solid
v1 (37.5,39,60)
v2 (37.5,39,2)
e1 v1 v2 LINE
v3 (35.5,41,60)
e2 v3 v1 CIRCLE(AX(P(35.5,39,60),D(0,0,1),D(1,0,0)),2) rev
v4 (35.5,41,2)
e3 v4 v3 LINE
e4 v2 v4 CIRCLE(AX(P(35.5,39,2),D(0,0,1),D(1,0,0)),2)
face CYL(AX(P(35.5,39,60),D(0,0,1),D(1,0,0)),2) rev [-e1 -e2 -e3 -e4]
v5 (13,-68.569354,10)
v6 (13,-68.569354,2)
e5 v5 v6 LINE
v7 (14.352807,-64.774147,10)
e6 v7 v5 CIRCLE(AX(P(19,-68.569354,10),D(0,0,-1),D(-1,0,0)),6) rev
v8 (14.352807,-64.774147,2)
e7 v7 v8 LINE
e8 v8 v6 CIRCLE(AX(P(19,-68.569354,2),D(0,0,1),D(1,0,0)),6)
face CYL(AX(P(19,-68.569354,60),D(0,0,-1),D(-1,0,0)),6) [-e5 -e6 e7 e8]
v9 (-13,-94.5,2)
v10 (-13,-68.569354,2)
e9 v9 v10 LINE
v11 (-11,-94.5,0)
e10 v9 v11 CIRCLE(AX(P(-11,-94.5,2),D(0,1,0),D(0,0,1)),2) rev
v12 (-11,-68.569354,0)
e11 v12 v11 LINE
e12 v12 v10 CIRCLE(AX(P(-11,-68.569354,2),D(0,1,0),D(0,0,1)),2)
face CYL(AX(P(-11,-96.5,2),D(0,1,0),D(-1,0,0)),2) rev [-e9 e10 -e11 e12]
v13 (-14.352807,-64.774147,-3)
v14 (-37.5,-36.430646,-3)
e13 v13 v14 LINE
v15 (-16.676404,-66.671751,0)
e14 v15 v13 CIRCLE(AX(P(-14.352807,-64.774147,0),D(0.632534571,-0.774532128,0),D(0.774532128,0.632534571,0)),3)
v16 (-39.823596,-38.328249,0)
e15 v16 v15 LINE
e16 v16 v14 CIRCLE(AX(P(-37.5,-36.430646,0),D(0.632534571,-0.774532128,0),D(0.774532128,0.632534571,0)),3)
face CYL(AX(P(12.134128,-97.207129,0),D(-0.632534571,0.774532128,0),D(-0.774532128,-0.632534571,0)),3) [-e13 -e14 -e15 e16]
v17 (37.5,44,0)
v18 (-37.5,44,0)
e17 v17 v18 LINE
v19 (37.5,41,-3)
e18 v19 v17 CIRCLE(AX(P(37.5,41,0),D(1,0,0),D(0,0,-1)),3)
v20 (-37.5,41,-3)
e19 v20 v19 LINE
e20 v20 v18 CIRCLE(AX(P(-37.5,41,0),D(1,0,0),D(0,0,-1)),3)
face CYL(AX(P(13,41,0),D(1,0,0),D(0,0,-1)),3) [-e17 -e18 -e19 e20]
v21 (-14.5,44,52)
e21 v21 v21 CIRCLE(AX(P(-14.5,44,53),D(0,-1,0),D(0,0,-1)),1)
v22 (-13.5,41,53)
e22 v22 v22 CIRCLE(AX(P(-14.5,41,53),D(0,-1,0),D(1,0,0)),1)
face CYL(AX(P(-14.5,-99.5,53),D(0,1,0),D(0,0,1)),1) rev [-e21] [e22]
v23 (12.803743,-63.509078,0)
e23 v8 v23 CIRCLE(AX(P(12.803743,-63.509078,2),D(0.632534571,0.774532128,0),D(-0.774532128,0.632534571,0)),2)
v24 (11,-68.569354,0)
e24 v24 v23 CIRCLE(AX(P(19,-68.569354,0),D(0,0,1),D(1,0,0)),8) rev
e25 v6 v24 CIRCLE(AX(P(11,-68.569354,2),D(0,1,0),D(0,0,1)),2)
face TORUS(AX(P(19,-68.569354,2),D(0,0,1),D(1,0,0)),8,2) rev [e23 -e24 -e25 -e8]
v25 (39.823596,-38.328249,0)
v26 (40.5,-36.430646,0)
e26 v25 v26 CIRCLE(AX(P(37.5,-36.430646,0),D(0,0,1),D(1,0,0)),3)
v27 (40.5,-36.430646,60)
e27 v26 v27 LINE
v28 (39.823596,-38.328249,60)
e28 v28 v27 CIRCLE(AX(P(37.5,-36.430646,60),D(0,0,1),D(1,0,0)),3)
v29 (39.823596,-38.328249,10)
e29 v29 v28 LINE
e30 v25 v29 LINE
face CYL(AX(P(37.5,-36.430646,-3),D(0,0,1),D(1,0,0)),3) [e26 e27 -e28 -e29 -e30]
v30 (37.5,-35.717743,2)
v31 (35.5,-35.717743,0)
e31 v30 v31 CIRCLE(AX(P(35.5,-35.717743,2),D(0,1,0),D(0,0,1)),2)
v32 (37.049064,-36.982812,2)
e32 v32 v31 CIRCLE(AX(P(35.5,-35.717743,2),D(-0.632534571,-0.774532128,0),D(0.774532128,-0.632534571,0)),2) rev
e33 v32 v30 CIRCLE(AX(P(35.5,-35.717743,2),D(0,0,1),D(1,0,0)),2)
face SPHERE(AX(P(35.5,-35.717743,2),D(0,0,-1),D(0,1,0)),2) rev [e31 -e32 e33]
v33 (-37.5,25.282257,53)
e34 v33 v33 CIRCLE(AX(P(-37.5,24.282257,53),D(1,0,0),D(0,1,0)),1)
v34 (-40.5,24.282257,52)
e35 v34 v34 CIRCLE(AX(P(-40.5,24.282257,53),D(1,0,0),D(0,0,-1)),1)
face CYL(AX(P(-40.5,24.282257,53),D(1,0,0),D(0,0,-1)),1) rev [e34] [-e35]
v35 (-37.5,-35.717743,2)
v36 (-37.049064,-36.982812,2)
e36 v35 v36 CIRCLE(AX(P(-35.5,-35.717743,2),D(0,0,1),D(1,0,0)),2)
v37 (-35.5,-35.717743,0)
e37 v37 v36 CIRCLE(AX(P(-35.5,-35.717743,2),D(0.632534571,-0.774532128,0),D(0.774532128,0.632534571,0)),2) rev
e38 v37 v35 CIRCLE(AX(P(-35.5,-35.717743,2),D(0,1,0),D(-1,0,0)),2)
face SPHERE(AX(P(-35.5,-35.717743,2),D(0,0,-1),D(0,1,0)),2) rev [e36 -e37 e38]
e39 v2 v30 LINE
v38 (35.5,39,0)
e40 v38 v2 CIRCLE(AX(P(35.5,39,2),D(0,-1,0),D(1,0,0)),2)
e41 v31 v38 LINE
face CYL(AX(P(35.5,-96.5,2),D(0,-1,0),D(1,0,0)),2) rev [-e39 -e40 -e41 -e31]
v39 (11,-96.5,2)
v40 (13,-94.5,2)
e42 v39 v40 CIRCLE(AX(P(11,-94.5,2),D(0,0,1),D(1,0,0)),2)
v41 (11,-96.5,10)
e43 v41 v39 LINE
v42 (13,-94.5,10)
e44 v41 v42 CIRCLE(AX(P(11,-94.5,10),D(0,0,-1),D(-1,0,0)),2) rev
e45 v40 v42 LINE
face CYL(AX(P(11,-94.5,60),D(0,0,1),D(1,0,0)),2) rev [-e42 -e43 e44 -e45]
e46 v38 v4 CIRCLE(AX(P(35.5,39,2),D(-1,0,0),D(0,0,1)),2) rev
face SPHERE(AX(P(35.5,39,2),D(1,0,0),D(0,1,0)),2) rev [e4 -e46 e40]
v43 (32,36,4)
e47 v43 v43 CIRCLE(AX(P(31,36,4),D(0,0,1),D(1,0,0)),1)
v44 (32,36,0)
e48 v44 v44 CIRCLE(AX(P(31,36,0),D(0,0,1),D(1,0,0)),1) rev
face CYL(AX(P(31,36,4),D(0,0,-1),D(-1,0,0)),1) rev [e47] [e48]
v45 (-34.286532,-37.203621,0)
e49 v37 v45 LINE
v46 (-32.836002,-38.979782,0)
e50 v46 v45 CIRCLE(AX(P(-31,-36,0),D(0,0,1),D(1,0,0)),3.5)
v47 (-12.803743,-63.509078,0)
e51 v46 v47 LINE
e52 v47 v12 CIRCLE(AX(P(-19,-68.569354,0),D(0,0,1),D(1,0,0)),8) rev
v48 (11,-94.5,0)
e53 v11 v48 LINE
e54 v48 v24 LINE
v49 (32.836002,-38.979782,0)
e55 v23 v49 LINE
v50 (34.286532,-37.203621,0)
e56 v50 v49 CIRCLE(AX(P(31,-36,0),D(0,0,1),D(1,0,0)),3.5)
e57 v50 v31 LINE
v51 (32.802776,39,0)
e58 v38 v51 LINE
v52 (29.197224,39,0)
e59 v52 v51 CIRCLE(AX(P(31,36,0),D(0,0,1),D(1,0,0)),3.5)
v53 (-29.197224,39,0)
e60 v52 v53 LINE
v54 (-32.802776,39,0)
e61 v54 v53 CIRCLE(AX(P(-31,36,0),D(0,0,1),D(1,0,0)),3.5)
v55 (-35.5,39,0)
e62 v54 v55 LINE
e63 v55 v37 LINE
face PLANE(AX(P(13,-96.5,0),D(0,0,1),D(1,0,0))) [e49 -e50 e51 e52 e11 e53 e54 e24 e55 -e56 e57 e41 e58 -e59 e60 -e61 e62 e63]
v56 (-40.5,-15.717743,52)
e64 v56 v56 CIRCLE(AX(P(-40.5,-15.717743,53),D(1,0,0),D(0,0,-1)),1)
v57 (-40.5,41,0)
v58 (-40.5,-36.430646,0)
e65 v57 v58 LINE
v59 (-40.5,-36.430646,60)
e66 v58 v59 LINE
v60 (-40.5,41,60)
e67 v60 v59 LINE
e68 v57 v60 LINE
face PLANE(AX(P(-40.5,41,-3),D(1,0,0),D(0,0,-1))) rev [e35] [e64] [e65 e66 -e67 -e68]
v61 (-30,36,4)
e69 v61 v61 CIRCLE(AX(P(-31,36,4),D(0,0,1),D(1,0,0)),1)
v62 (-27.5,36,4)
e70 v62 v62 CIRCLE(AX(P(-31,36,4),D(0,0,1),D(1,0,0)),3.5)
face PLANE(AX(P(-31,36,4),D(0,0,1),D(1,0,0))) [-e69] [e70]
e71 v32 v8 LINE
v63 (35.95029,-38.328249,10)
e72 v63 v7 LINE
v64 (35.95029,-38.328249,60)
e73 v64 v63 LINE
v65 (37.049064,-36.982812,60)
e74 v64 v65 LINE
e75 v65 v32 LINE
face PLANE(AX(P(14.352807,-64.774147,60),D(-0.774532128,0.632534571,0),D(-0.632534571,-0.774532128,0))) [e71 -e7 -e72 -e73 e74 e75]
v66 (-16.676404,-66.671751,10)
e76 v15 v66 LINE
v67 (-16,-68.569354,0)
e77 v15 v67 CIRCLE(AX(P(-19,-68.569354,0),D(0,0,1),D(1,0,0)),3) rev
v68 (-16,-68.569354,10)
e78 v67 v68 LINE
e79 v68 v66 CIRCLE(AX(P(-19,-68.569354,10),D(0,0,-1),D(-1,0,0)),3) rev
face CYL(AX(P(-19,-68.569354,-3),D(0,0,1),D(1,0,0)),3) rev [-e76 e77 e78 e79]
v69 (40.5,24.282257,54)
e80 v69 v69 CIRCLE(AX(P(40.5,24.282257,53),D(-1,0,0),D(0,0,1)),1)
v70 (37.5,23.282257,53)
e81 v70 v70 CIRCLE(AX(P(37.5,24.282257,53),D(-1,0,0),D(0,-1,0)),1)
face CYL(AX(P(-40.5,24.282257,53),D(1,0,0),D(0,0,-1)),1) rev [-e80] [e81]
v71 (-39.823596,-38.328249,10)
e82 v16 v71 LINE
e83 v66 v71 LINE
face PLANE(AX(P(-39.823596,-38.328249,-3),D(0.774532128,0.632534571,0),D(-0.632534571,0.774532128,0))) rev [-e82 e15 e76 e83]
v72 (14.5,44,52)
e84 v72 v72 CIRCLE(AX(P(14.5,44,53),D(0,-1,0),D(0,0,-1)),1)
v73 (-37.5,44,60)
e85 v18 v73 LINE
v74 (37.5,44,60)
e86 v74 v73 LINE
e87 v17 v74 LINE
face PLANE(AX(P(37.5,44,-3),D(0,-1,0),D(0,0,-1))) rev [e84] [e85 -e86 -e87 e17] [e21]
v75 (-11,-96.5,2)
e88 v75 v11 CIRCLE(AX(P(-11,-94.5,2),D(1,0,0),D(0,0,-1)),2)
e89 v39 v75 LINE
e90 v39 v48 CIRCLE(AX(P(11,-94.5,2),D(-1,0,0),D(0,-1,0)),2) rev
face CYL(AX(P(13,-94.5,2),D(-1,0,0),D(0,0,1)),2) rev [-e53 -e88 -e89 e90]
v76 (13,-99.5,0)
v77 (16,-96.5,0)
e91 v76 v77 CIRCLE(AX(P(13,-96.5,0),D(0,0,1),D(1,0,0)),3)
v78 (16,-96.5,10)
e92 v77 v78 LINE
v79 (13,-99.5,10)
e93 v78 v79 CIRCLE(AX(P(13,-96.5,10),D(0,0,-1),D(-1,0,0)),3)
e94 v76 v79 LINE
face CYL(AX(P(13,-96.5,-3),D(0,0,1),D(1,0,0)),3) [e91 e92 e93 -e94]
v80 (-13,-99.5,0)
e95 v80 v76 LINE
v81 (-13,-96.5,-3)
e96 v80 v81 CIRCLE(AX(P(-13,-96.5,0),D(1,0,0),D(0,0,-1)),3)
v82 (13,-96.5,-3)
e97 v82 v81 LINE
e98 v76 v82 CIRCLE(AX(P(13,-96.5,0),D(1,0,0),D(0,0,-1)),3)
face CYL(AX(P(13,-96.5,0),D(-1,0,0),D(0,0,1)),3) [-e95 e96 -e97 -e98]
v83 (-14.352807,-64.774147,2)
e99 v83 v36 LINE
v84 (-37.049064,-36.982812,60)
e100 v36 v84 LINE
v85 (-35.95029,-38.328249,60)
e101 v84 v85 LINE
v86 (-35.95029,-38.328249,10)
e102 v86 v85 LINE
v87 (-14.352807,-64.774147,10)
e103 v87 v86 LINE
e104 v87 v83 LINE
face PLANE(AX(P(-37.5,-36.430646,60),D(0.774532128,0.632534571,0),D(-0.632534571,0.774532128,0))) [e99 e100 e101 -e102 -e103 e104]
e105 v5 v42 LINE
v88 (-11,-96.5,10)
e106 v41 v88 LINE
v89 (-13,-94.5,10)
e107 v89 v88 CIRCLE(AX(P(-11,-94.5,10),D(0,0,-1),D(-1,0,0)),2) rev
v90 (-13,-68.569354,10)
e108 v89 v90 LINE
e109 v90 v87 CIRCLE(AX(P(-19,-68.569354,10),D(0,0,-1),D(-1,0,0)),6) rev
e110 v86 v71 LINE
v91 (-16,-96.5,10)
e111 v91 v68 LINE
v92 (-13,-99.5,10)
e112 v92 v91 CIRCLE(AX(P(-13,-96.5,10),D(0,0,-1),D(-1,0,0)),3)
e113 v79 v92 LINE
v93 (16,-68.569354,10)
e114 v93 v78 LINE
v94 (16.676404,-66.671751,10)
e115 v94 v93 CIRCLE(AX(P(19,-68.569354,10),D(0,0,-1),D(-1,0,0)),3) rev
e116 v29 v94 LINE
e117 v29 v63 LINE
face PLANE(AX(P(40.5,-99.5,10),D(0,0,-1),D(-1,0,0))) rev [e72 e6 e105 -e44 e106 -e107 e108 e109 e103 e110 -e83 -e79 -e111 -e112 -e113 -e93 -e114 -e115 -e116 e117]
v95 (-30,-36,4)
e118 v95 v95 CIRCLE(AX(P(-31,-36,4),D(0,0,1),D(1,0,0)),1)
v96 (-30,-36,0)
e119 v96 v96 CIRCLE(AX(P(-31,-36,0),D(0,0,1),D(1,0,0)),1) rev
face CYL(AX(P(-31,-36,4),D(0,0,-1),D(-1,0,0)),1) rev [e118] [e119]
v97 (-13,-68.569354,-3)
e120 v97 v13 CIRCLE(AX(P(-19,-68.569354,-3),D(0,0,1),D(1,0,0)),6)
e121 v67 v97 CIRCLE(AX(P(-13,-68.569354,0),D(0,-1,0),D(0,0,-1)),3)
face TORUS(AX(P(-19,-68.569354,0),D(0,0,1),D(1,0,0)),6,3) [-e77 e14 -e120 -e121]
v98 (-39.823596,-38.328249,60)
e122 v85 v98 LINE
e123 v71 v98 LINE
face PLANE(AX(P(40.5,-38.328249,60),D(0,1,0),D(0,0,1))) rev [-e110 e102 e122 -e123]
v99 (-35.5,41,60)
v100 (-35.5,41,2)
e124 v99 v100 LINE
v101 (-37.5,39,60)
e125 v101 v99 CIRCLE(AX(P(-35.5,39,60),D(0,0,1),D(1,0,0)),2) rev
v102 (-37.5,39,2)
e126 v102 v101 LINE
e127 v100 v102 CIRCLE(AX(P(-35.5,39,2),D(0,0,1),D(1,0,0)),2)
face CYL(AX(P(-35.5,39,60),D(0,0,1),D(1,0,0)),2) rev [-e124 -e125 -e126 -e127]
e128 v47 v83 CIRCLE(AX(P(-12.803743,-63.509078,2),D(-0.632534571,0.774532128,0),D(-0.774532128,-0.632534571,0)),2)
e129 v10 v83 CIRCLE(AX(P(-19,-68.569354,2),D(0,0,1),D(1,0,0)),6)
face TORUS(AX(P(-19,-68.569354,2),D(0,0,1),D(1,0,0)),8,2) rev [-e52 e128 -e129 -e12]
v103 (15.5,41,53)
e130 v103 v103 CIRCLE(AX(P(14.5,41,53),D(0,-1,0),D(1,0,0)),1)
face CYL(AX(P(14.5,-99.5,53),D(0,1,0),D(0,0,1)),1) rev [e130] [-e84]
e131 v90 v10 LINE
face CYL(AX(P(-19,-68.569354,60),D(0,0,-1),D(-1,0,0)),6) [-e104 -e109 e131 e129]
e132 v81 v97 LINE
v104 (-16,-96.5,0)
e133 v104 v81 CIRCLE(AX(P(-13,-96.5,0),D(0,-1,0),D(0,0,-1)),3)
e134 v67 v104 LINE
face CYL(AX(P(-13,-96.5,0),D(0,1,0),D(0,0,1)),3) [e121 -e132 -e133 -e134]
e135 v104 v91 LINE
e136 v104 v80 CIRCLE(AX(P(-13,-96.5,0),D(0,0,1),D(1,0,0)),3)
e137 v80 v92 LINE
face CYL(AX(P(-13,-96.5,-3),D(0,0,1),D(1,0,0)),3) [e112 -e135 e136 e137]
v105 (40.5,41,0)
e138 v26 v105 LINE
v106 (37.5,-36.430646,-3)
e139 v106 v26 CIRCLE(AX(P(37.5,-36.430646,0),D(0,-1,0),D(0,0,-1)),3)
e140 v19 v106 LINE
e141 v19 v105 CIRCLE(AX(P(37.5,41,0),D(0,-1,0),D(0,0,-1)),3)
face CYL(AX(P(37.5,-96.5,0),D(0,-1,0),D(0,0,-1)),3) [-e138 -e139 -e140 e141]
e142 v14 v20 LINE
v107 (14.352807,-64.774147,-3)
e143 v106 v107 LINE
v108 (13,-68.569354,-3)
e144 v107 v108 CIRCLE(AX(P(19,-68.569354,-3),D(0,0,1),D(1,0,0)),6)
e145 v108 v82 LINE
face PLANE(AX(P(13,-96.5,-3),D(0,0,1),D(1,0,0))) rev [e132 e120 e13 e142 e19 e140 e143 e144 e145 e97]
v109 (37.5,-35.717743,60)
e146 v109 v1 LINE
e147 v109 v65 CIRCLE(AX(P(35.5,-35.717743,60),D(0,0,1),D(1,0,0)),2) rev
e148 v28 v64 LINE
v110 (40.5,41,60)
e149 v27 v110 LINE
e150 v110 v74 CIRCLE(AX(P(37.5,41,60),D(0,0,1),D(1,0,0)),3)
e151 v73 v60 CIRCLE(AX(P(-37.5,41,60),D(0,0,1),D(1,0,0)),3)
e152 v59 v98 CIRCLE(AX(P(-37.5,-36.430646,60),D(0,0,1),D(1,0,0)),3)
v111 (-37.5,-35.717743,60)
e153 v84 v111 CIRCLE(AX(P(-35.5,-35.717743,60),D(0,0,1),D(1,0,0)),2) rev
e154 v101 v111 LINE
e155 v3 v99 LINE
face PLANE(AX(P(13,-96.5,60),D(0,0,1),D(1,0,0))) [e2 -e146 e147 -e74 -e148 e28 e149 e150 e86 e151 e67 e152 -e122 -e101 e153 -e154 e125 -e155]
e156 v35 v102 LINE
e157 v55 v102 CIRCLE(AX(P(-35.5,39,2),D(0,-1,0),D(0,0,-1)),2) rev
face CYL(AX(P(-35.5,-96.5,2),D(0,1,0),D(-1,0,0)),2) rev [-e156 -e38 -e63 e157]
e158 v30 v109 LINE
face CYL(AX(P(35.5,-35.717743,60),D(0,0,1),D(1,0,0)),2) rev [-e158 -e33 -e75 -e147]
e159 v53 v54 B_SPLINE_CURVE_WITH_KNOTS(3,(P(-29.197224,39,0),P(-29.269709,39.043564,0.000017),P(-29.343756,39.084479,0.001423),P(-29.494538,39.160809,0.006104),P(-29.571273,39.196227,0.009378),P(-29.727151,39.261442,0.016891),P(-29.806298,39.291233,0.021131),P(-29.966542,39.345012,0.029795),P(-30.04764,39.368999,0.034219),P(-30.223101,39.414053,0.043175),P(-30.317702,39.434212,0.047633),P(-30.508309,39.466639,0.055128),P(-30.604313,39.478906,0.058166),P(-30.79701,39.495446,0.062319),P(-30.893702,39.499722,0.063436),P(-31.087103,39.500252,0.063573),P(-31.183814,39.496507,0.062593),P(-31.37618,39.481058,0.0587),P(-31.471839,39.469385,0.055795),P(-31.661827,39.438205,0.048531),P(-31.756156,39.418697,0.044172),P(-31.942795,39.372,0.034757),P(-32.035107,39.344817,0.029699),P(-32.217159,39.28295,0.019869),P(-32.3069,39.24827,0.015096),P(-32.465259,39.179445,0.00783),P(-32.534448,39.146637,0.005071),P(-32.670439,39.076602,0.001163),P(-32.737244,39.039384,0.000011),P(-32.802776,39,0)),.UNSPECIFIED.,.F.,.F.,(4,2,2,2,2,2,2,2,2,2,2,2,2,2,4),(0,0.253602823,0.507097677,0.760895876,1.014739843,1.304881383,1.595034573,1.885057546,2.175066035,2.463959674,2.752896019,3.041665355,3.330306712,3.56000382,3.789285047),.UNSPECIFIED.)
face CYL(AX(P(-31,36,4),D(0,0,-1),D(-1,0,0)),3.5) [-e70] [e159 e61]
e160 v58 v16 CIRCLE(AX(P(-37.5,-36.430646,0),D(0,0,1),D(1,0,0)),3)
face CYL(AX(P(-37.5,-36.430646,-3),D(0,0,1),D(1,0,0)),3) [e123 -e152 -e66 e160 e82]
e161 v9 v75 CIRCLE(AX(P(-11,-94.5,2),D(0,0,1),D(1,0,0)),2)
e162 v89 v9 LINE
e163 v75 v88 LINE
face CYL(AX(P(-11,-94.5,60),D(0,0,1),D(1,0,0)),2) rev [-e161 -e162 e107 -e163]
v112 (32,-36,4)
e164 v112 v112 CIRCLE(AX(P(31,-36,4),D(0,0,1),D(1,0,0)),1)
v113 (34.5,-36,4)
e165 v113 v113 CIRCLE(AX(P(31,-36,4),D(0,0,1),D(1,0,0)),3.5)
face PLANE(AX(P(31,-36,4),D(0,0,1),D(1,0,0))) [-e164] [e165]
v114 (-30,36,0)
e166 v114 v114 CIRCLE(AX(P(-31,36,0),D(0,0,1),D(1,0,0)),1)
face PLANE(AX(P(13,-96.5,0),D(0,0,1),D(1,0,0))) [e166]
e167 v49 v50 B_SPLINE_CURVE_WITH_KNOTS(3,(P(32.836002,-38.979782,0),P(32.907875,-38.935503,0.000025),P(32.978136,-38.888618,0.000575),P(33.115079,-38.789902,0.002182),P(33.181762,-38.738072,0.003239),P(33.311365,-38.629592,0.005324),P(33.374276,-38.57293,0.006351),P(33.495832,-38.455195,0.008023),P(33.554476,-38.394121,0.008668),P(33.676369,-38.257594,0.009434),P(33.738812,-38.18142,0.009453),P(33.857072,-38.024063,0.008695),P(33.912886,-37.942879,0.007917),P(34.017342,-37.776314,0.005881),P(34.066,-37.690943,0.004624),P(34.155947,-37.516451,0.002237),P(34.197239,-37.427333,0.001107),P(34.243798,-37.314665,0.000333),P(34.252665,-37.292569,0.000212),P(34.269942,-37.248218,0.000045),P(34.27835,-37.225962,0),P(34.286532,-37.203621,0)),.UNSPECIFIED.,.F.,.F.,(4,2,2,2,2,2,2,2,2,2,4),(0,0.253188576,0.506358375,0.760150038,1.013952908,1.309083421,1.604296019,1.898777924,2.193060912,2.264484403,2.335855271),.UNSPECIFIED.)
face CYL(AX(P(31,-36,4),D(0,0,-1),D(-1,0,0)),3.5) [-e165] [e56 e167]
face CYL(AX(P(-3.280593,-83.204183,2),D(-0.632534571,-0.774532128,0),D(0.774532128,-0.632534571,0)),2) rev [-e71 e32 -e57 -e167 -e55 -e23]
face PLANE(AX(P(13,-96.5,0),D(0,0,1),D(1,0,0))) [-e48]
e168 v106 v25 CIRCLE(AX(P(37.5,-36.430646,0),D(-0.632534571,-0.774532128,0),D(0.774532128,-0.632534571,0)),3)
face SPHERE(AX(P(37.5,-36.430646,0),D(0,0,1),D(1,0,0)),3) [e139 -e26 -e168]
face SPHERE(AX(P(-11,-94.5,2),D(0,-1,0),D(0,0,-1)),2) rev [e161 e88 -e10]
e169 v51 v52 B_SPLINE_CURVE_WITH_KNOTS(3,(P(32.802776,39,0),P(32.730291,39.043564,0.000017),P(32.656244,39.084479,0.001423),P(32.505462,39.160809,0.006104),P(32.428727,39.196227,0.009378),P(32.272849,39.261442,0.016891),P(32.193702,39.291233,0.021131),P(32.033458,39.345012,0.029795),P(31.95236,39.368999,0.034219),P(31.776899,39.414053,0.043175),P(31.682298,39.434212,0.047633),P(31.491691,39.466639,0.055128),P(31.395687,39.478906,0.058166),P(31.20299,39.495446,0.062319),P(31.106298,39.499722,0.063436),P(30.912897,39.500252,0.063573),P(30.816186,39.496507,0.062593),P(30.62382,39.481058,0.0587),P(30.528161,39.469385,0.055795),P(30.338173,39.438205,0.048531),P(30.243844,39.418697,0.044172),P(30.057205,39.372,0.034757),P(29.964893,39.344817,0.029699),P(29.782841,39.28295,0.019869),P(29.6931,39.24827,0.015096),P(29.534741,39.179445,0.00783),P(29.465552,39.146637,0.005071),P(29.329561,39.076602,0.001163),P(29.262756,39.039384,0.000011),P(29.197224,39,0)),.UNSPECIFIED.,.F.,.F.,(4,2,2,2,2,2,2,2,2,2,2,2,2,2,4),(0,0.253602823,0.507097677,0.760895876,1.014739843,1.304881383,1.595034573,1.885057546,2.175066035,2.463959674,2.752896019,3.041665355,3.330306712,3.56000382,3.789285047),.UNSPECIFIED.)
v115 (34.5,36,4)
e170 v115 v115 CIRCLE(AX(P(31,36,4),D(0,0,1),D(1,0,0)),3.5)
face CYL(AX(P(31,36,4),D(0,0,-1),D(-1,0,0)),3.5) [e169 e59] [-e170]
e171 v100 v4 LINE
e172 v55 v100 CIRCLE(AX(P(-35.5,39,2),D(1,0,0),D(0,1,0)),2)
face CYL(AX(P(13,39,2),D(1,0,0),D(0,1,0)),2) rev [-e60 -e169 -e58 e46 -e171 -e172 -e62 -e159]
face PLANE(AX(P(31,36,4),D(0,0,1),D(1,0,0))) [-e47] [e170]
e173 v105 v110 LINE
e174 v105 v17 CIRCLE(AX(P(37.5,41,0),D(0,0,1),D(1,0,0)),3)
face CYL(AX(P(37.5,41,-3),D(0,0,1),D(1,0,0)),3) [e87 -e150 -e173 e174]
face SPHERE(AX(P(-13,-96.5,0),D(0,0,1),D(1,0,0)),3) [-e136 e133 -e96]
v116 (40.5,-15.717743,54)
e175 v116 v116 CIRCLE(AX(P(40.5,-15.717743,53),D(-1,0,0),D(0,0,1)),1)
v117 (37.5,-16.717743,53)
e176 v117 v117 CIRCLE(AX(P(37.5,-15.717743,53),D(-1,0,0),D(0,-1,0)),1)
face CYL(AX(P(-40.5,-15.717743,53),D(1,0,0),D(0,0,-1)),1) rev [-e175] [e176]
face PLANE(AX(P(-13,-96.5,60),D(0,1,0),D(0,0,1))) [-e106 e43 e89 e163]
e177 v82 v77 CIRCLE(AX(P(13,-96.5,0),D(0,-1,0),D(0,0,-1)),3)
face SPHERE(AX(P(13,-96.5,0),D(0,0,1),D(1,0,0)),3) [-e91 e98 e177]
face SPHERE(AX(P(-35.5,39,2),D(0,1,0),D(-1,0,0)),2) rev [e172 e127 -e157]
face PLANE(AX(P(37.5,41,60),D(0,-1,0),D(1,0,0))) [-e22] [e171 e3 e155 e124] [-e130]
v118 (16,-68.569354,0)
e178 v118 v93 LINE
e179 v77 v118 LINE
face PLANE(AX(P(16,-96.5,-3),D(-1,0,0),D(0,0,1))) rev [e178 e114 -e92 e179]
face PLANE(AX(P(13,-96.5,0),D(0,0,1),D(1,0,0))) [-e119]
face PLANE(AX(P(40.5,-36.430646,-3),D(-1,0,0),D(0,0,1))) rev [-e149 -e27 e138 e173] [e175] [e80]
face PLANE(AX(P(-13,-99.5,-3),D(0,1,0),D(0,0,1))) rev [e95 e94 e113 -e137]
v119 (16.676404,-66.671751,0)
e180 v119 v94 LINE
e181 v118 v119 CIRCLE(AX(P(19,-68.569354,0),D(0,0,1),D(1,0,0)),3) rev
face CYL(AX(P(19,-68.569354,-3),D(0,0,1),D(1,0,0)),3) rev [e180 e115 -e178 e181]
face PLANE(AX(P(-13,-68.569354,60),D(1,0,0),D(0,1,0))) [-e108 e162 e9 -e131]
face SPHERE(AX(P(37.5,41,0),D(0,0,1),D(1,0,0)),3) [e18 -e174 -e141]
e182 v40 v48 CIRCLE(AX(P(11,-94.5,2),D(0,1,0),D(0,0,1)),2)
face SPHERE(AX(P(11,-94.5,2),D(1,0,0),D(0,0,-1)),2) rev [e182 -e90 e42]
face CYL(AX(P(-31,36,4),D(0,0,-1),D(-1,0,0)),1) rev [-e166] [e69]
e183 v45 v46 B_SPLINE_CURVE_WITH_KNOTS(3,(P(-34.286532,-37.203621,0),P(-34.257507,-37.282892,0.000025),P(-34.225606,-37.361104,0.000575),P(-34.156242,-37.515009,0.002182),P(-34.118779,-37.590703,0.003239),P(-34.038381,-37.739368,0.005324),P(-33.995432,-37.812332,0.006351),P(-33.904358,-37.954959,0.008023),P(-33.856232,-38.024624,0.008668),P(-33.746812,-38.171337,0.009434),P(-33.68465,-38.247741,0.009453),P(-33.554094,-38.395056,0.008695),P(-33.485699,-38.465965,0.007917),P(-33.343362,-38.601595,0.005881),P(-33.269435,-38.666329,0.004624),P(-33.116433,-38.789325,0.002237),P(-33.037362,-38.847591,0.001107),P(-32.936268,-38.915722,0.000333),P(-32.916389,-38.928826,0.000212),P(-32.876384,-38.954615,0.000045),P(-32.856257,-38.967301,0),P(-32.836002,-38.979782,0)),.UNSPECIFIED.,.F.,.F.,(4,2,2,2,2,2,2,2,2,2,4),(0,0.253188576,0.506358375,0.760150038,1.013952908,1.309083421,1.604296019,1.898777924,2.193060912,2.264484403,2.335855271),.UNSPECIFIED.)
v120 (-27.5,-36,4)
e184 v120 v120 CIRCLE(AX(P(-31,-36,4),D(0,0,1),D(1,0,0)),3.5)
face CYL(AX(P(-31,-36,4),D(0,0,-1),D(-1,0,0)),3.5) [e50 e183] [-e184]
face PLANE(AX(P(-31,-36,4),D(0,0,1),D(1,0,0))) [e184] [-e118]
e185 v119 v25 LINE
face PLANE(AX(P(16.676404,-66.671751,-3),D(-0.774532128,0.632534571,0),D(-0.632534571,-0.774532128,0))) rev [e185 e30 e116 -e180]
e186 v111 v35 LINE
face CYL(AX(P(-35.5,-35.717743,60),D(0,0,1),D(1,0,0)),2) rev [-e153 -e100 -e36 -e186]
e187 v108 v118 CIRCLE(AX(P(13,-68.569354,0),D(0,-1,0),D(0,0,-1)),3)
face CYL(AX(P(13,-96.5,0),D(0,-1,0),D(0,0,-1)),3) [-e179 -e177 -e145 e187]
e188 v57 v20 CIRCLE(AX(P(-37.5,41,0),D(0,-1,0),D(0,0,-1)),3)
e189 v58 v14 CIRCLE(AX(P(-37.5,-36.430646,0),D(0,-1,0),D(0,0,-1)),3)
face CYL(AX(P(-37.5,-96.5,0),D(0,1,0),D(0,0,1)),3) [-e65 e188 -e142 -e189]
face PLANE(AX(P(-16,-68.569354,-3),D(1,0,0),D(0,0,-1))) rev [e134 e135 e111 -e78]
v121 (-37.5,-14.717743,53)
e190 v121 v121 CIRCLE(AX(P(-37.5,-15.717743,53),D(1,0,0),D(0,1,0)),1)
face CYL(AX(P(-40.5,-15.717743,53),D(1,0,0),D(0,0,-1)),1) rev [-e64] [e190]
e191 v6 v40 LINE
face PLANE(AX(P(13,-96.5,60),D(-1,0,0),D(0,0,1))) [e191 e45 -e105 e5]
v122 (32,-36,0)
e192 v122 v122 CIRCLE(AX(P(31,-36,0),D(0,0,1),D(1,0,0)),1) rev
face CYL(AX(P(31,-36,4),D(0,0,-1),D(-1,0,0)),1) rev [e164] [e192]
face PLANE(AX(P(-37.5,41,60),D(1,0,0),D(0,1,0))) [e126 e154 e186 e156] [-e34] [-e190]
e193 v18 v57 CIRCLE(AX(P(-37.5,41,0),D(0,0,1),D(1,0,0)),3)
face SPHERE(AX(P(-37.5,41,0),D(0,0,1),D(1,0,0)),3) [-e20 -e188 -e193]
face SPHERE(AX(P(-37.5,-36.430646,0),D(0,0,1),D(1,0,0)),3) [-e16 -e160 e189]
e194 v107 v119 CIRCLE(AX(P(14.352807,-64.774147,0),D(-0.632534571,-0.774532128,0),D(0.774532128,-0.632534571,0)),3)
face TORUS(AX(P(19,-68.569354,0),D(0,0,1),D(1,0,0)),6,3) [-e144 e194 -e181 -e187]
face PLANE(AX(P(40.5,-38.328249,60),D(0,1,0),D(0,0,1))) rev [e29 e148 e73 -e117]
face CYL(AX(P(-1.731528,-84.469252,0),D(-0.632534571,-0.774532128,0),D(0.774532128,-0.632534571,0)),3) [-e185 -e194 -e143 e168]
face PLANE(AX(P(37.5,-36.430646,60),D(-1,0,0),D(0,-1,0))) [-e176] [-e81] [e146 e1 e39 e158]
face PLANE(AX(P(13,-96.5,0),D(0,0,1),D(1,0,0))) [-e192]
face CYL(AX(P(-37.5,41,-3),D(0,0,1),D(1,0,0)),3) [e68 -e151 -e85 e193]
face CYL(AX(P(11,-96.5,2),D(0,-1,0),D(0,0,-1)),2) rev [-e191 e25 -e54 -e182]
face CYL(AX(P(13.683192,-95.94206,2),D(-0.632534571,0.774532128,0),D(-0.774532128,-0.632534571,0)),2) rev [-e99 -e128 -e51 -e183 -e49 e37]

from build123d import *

# Parameters (mm, degrees)
SKETCH1_R                       = 3.5
SKETCH1_R_2                     = 1
PCB_STANDOFFS_DEPTH             = 4
PCB_STANDOFFS_2_DEPTH           = 4
PCB_STANDOFFS_3_DEPTH           = 4
PCB_STANDOFFS_4_DEPTH           = 4
CASE_BACKING_DEPTH              = 3
CASING_START                    = 60
CASING_SIDES_DEPTH              = 60
CASING_INNER_EDGE_FILLETS_2MM_R = 2
CASING_OUTER_EDGE_FILLETS_3MM_R = 3
BOTTOM_CASING_CUT_DEPTH         = 142.637742145
BOTTOM_CASING_CUT_DEPTH_BACK    = 142.637742145
SKETCH4_W                       = 50
SKETCH4_H                       = 61.171750673
SIDE_SCREWHOLES_DEPTH           = 142.637742145
SIDE_SCREWHOLES_DEPTH_BACK      = 142.637742145
SKETCH5_R                       = 1
TOP_SCREWHOLES_DEPTH            = 161.724920283
TOP_SCREWHOLES_DEPTH_BACK       = 161.724920283
SKETCH6_R                       = 1


with BuildPart() as part:
    # Sketch1 → PCB standoffs (new body)
    with BuildSketch(Plane.XY):
        with Locations((-31, 36)):
            Circle(SKETCH1_R)
        with Locations((-31, 36)):
            Circle(SKETCH1_R_2, mode=Mode.SUBTRACT)
    extrude(amount=PCB_STANDOFFS_DEPTH)



with BuildPart() as body_2:
    # Sketch1 → PCB standoffs 2 (new body)
    with BuildSketch(Plane.XY):
        with Locations((31, 36)):
            Circle(SKETCH1_R)
        with Locations((31, 36)):
            Circle(SKETCH1_R_2, mode=Mode.SUBTRACT)
    extrude(amount=PCB_STANDOFFS_2_DEPTH)


with BuildPart() as body_3:
    # Sketch1 → PCB standoffs 3 (new body)
    with BuildSketch(Plane.XY):
        with Locations((31, -36)):
            Circle(SKETCH1_R)
        with Locations((31, -36)):
            Circle(SKETCH1_R_2, mode=Mode.SUBTRACT)
    extrude(amount=PCB_STANDOFFS_3_DEPTH)


with BuildPart() as body_4:
    # Sketch1 → PCB standoffs 4 (new body)
    with BuildSketch(Plane.XY):
        with Locations((-31, -36)):
            Circle(SKETCH1_R)
        with Locations((-31, -36)):
            Circle(SKETCH1_R_2, mode=Mode.SUBTRACT)
    extrude(amount=PCB_STANDOFFS_4_DEPTH)


with BuildPart() as part_1:
    add(part.part)

    add(body_2.part)  # Case backing merges body 2

    add(body_3.part)  # Case backing merges body 3

    add(body_4.part)  # Case backing merges body 4
    # Sketch2 → Case backing (add)
    with BuildSketch(Plane(origin=(0, 0, 0), x_dir=(-1, 0, 0), z_dir=(0, 0, -1))):
        with BuildLine():
            Line((-40.5, -36.430645615), (-40.5, 41))
            ThreePointArc((-40.5, 41), (-39.621320344, 43.121320344), (-37.5, 44))
            Line((-37.5, 44), (37.5, 44))
            ThreePointArc((37.5, 44), (39.621320344, 43.121320344), (40.5, 41))
            Line((40.5, 41), (40.5, -36.430645615))
            ThreePointArc((40.5, -36.430645615), (40.325844046, -37.437921856), (39.823596383, -38.328249327))
            Line((39.823596383, -38.328249327), (16.676403617, -66.671750673))
            ThreePointArc((16.676403617, -66.671750673), (16.174155954, -67.562078144), (16, -68.569354385))
            Line((16, -68.569354385), (16, -96.5))
            ThreePointArc((16, -96.5), (15.121320344, -98.621320344), (13, -99.5))
            Line((13, -99.5), (-13, -99.5))
            ThreePointArc((-13, -99.5), (-15.121320344, -98.621320344), (-16, -96.5))
            Line((-16, -96.5), (-16, -68.569354385))
            ThreePointArc((-16, -68.569354385), (-16.174155954, -67.562078144), (-16.676403617, -66.671750673))
            Line((-16.676403617, -66.671750673), (-39.823596383, -38.328249327))
            ThreePointArc((-39.823596383, -38.328249327), (-40.325844046, -37.437921856), (-40.5, -36.430645615))
        make_face()
    extrude(amount=CASE_BACKING_DEPTH)

    # Sketch3 → Casing sides (add)
    with BuildSketch(Plane.XY.offset(CASING_START)):
        with BuildLine():
            Line((16, -96.5), (16, -68.569354385))
            ThreePointArc((16, -68.569354385), (16.174155954, -67.562078144), (16.676403617, -66.671750673))
            Line((16.676403617, -66.671750673), (39.823596383, -38.328249327))
            ThreePointArc((39.823596383, -38.328249327), (40.325844046, -37.437921856), (40.5, -36.430645615))
            Line((40.5, -36.430645615), (40.5, 41))
            ThreePointArc((40.5, 41), (39.621320344, 43.121320344), (37.5, 44))
            Line((37.5, 44), (-37.5, 44))
            ThreePointArc((-37.5, 44), (-39.621320344, 43.121320344), (-40.5, 41))
            Line((-40.5, 41), (-40.5, -36.430645615))
            ThreePointArc((-40.5, -36.430645615), (-40.325844046, -37.437921856), (-39.823596383, -38.328249327))
            Line((-39.823596383, -38.328249327), (-16.676403617, -66.671750673))
            ThreePointArc((-16.676403617, -66.671750673), (-16.174155954, -67.562078144), (-16, -68.569354385))
            Line((-16, -68.569354385), (-16, -96.5))
            ThreePointArc((-16, -96.5), (-15.121320344, -98.621320344), (-13, -99.5))
            Line((-13, -99.5), (13, -99.5))
            ThreePointArc((13, -99.5), (15.121320344, -98.621320344), (16, -96.5))
        make_face()
        with BuildLine():
            Line((13, -96.5), (13, -68.569354385))
            ThreePointArc((13, -68.569354385), (13.348311907, -66.554801903), (14.352807234, -64.77414696))
            Line((14.352807234, -64.77414696), (37.5, -36.430645615))
            Line((37.5, -36.430645615), (37.5, 41))
            Line((37.5, 41), (-37.5, 41))
            Line((-37.5, 41), (-37.5, -36.430645615))
            Line((-37.5, -36.430645615), (-14.352807234, -64.77414696))
            ThreePointArc((-14.352807234, -64.77414696), (-13.348311907, -66.554801903), (-13, -68.569354385))
            Line((-13, -68.569354385), (-13, -96.5))
            Line((-13, -96.5), (13, -96.5))
        make_face(mode=Mode.SUBTRACT)
    extrude(amount=-CASING_SIDES_DEPTH)

    # Casing inner edge fillets 2mm
    # the kernel refuses this fillet: 2 mm, written as the material it adds along each edge
    with BuildSketch(Plane(origin=(11, -94.5, 2), x_dir=(0, -1, 0), z_dir=(0, 0, -1))) as casing_inner_edge_fillets_2mm_piece_1_section:
        Polygon((0, 0), (CASING_INNER_EDGE_FILLETS_2MM_R, 0), (CASING_INNER_EDGE_FILLETS_2MM_R, -CASING_INNER_EDGE_FILLETS_2MM_R), (0, -CASING_INNER_EDGE_FILLETS_2MM_R), align=None)
    casing_inner_edge_fillets_2mm_piece_1 = extrude(amount=CASING_INNER_EDGE_FILLETS_2MM_R, mode=Mode.PRIVATE)
    casing_inner_edge_fillets_2mm_piece_1 = casing_inner_edge_fillets_2mm_piece_1 - Plane(origin=(11, -94.5, 2), x_dir=(-0.7071067811865475, 0.7071067811865475, 0), z_dir=(0, 0, -1)) * Sphere(CASING_INNER_EDGE_FILLETS_2MM_R, mode=Mode.PRIVATE)
    add(casing_inner_edge_fillets_2mm_piece_1)
    with BuildSketch(Plane(origin=(35.5, -35.717742691, 2), x_dir=(0.7745321275866414, -0.6325345708624239, 0), z_dir=(0, 0, -1))) as casing_inner_edge_fillets_2mm_piece_2_section:
        Polygon((0, 0), (CASING_INNER_EDGE_FILLETS_2MM_R, 0), (CASING_INNER_EDGE_FILLETS_2MM_R, -CASING_INNER_EDGE_FILLETS_2MM_R * 0.356451461785), (CASING_INNER_EDGE_FILLETS_2MM_R * 0.774532127587, -CASING_INNER_EDGE_FILLETS_2MM_R * 0.632534570862), align=None)
    casing_inner_edge_fillets_2mm_piece_2 = extrude(amount=CASING_INNER_EDGE_FILLETS_2MM_R, mode=Mode.PRIVATE)
    casing_inner_edge_fillets_2mm_piece_2 = casing_inner_edge_fillets_2mm_piece_2 - Plane(origin=(35.5, -35.717742691, 2), x_dir=(-0.9419480154410438, 0.3357587470292908, 0), z_dir=(0, 0, -1)) * Sphere(CASING_INNER_EDGE_FILLETS_2MM_R, mode=Mode.PRIVATE)
    add(casing_inner_edge_fillets_2mm_piece_2)
    with BuildSketch(Plane(origin=(35.5, 39, 2), x_dir=(1, 0, 0), z_dir=(0, 0, -1))) as casing_inner_edge_fillets_2mm_piece_3_section:
        Polygon((0, 0), (CASING_INNER_EDGE_FILLETS_2MM_R, 0), (CASING_INNER_EDGE_FILLETS_2MM_R, -CASING_INNER_EDGE_FILLETS_2MM_R), (0, -CASING_INNER_EDGE_FILLETS_2MM_R), align=None)
    casing_inner_edge_fillets_2mm_piece_3 = extrude(amount=CASING_INNER_EDGE_FILLETS_2MM_R, mode=Mode.PRIVATE)
    casing_inner_edge_fillets_2mm_piece_3 = casing_inner_edge_fillets_2mm_piece_3 - Plane(origin=(35.5, 39, 2), x_dir=(-0.7071067811865475, -0.7071067811865476, 0), z_dir=(0, 0, -1)) * Sphere(CASING_INNER_EDGE_FILLETS_2MM_R, mode=Mode.PRIVATE)
    add(casing_inner_edge_fillets_2mm_piece_3)
    with BuildSketch(Plane(origin=(-35.5, 39, 2), x_dir=(0, 0, -1), z_dir=(-1, 0, 0))) as casing_inner_edge_fillets_2mm_piece_4_section:
        Polygon((0, 0), (CASING_INNER_EDGE_FILLETS_2MM_R, 0), (CASING_INNER_EDGE_FILLETS_2MM_R, -CASING_INNER_EDGE_FILLETS_2MM_R), (0, -CASING_INNER_EDGE_FILLETS_2MM_R), align=None)
    casing_inner_edge_fillets_2mm_piece_4 = extrude(amount=CASING_INNER_EDGE_FILLETS_2MM_R, mode=Mode.PRIVATE)
    casing_inner_edge_fillets_2mm_piece_4 = casing_inner_edge_fillets_2mm_piece_4 - Plane(origin=(-35.5, 39, 2), x_dir=(0, -0.7071067811865475, 0.7071067811865475), z_dir=(-1, 0, 0)) * Sphere(CASING_INNER_EDGE_FILLETS_2MM_R, mode=Mode.PRIVATE)
    add(casing_inner_edge_fillets_2mm_piece_4)
    with BuildSketch(Plane(origin=(-35.5, -35.717742691, 2), x_dir=(-0.7745321275866417, -0.6325345708624235, 0), z_dir=(0, 0, -1))) as casing_inner_edge_fillets_2mm_piece_5_section:
        Polygon((0, 0), (CASING_INNER_EDGE_FILLETS_2MM_R, 0), (CASING_INNER_EDGE_FILLETS_2MM_R, CASING_INNER_EDGE_FILLETS_2MM_R * 0.356451461785), (CASING_INNER_EDGE_FILLETS_2MM_R * 0.774532127587, CASING_INNER_EDGE_FILLETS_2MM_R * 0.632534570862), align=None)
    casing_inner_edge_fillets_2mm_piece_5 = extrude(amount=CASING_INNER_EDGE_FILLETS_2MM_R, mode=Mode.PRIVATE)
    casing_inner_edge_fillets_2mm_piece_5 = casing_inner_edge_fillets_2mm_piece_5 - Plane(origin=(-35.5, -35.717742691, 2), x_dir=(0.9419480154410438, 0.3357587470292907, 0), z_dir=(0, 0, -1)) * Sphere(CASING_INNER_EDGE_FILLETS_2MM_R, mode=Mode.PRIVATE)
    add(casing_inner_edge_fillets_2mm_piece_5)
    with BuildSketch(Plane(origin=(-11, -94.5, 2), x_dir=(0, 0, -1), z_dir=(-1, 0, 0))) as casing_inner_edge_fillets_2mm_piece_6_section:
        Polygon((0, 0), (CASING_INNER_EDGE_FILLETS_2MM_R, 0), (CASING_INNER_EDGE_FILLETS_2MM_R, CASING_INNER_EDGE_FILLETS_2MM_R), (0, CASING_INNER_EDGE_FILLETS_2MM_R), align=None)
    casing_inner_edge_fillets_2mm_piece_6 = extrude(amount=CASING_INNER_EDGE_FILLETS_2MM_R, mode=Mode.PRIVATE)
    casing_inner_edge_fillets_2mm_piece_6 = casing_inner_edge_fillets_2mm_piece_6 - Plane(origin=(-11, -94.5, 2), x_dir=(0, 0.7071067811865475, 0.7071067811865475), z_dir=(-1, 0, 0)) * Sphere(CASING_INNER_EDGE_FILLETS_2MM_R, mode=Mode.PRIVATE)
    add(casing_inner_edge_fillets_2mm_piece_6)
    with BuildSketch(Plane(origin=(13, -94.5, 0), x_dir=(-1, 0, 0), z_dir=(0, 1, 0))) as casing_inner_edge_fillets_2mm_piece_7:
        with BuildLine():
            CenterArc((CASING_INNER_EDGE_FILLETS_2MM_R, CASING_INNER_EDGE_FILLETS_2MM_R), CASING_INNER_EDGE_FILLETS_2MM_R, 180, 90)
            Line((0, CASING_INNER_EDGE_FILLETS_2MM_R), (0, 0))
            Line((0, 0), (CASING_INNER_EDGE_FILLETS_2MM_R, 0))
        make_face()
    extrude(amount=25.930645615)
    with BuildSketch(Plane(origin=(19, -68.569354385, 0), x_dir=(-1, 0, 0), z_dir=(0, -1, 0))) as casing_inner_edge_fillets_2mm_piece_8:
        with BuildLine():
            CenterArc((6 + CASING_INNER_EDGE_FILLETS_2MM_R, -CASING_INNER_EDGE_FILLETS_2MM_R), CASING_INNER_EDGE_FILLETS_2MM_R, 90, 90)
            Line((6, -CASING_INNER_EDGE_FILLETS_2MM_R), (6, 0))
            Line((6, 0), (6 + CASING_INNER_EDGE_FILLETS_2MM_R, 0))
        make_face()
    revolve(axis=Axis((19, -68.569354385, 0), (0, 0, -1)), revolution_arc=39.237367113)
    with BuildSketch(Plane(origin=(14.352807234, -64.77414696, 0), x_dir=(-0.7745321275866413, 0.6325345708624239, 0), z_dir=(0.6325345708624239, 0.7745321275866414, 0)), Plane(origin=(-37.049064255, -36.982811833, 0), x_dir=(0.7745321275866417, 0.6325345708624235, 0), z_dir=(0.6325345708624235, -0.7745321275866417, 0))) as casing_inner_edge_fillets_2mm_piece_9:
        with BuildLine():
            CenterArc((CASING_INNER_EDGE_FILLETS_2MM_R, CASING_INNER_EDGE_FILLETS_2MM_R), CASING_INNER_EDGE_FILLETS_2MM_R, 180, 90)
            Line((0, CASING_INNER_EDGE_FILLETS_2MM_R), (0, 0))
            Line((0, 0), (CASING_INNER_EDGE_FILLETS_2MM_R, 0))
        make_face()
    extrude(amount=35.881449119)
    with BuildSketch(Plane(origin=(37.5, -35.717742691, 0), x_dir=(-1, 0, 0), z_dir=(0, 1, 0)), Plane(origin=(-37.5, 39, 0), x_dir=(1, 0, 0), z_dir=(0, -1, 0))) as casing_inner_edge_fillets_2mm_piece_10:
        with BuildLine():
            CenterArc((CASING_INNER_EDGE_FILLETS_2MM_R, CASING_INNER_EDGE_FILLETS_2MM_R), CASING_INNER_EDGE_FILLETS_2MM_R, 180, 90)
            Line((0, CASING_INNER_EDGE_FILLETS_2MM_R), (0, 0))
            Line((0, 0), (CASING_INNER_EDGE_FILLETS_2MM_R, 0))
        make_face()
    extrude(amount=74.717742691)
    with BuildSketch(Plane(origin=(35.5, 41, 0), x_dir=(0, -1, 0), z_dir=(-1, 0, 0))) as casing_inner_edge_fillets_2mm_piece_11:
        with BuildLine():
            CenterArc((CASING_INNER_EDGE_FILLETS_2MM_R, CASING_INNER_EDGE_FILLETS_2MM_R), CASING_INNER_EDGE_FILLETS_2MM_R, 180, 90)
            Line((0, CASING_INNER_EDGE_FILLETS_2MM_R), (0, 0))
            Line((0, 0), (CASING_INNER_EDGE_FILLETS_2MM_R, 0))
        make_face()
    extrude(amount=71)
    with BuildSketch(Plane(origin=(-19, -68.569354385, 0), x_dir=(0.7745321275866426, 0.6325345708624223, 0), z_dir=(-0.6325345708624223, 0.7745321275866426, 0))) as casing_inner_edge_fillets_2mm_piece_12:
        with BuildLine():
            CenterArc((6 + CASING_INNER_EDGE_FILLETS_2MM_R, -CASING_INNER_EDGE_FILLETS_2MM_R), CASING_INNER_EDGE_FILLETS_2MM_R, 90, 90)
            Line((6, -CASING_INNER_EDGE_FILLETS_2MM_R), (6, 0))
            Line((6, 0), (6 + CASING_INNER_EDGE_FILLETS_2MM_R, 0))
        make_face()
    revolve(axis=Axis((-19, -68.569354385, 0), (0, 0, -1)), revolution_arc=39.237367113)
    with BuildSketch(Plane(origin=(-13, -68.569354385, 0), x_dir=(0, 0, 1), z_dir=(0, -1, 0))) as casing_inner_edge_fillets_2mm_piece_13:
        with BuildLine():
            CenterArc((CASING_INNER_EDGE_FILLETS_2MM_R, -CASING_INNER_EDGE_FILLETS_2MM_R), CASING_INNER_EDGE_FILLETS_2MM_R, 90, 90)
            Line((0, -CASING_INNER_EDGE_FILLETS_2MM_R), (0, 0))
            Line((0, 0), (CASING_INNER_EDGE_FILLETS_2MM_R, 0))
        make_face()
    extrude(amount=25.930645615)
    with BuildSketch(Plane(origin=(-11, -96.5, 0), x_dir=(0, 1, 0), z_dir=(1, 0, 0))) as casing_inner_edge_fillets_2mm_piece_14:
        with BuildLine():
            CenterArc((CASING_INNER_EDGE_FILLETS_2MM_R, CASING_INNER_EDGE_FILLETS_2MM_R), CASING_INNER_EDGE_FILLETS_2MM_R, 180, 90)
            Line((0, CASING_INNER_EDGE_FILLETS_2MM_R), (0, 0))
            Line((0, 0), (CASING_INNER_EDGE_FILLETS_2MM_R, 0))
        make_face()
    extrude(amount=22)
    with BuildSketch(Plane(origin=(37.5, -36.430645615, 60), x_dir=(-0.6325345708624265, -0.7745321275866391, 0), z_dir=(0, 0, -1)), Plane(origin=(-37.5, -36.430645615, 60), x_dir=(0, 1, 0), z_dir=(0, 0, -1))) as casing_inner_edge_fillets_2mm_piece_15:
        with BuildLine():
            CenterArc((CASING_INNER_EDGE_FILLETS_2MM_R * 0.356451461785, CASING_INNER_EDGE_FILLETS_2MM_R), CASING_INNER_EDGE_FILLETS_2MM_R, 230.762632887, 39.237367113)
            Line((-CASING_INNER_EDGE_FILLETS_2MM_R * 0.276083109078, CASING_INNER_EDGE_FILLETS_2MM_R * 0.225467872413), (0, 0))
            Line((0, 0), (CASING_INNER_EDGE_FILLETS_2MM_R * 0.356451461785, 0))
        make_face()
    extrude(amount=58)
    with BuildSketch(Plane(origin=(37.5, 41, 60), x_dir=(0, -1, 0), z_dir=(0, 0, -1)), Plane(origin=(-37.5, 41, 60), x_dir=(1, 0, 0), z_dir=(0, 0, -1)), Plane(origin=(-13, -96.5, 60), x_dir=(0, 1, 0), z_dir=(0, 0, -1)), Plane(origin=(13, -96.5, 60), x_dir=(-1, 0, 0), z_dir=(0, 0, -1))) as casing_inner_edge_fillets_2mm_piece_16:
        with BuildLine():
            CenterArc((CASING_INNER_EDGE_FILLETS_2MM_R, CASING_INNER_EDGE_FILLETS_2MM_R), CASING_INNER_EDGE_FILLETS_2MM_R, 180, 90)
            Line((0, CASING_INNER_EDGE_FILLETS_2MM_R), (0, 0))
            Line((0, 0), (CASING_INNER_EDGE_FILLETS_2MM_R, 0))
        make_face()
    extrude(amount=58)

    # Casing outer edge fillets 3mm
    casing_outer_edge_fillets_3mm_edges = [part_1.edges().sort_by_distance(p)[0] for p in [
        (15.121320344, -98.621320344, -3),
        (0, -99.5, -3),
        (-15.121320344, -98.621320344, -3),
        (-16, -82.534677193, -3),
        (-16.174155954, -67.562078144, -3),
        (-28.25, -52.5, -3),
        (-40.325844046, -37.437921856, -3),
        (-40.5, 2.284677193, -3),
        (-39.621320344, 43.121320344, -3),
        (0, 44, -3),
        (39.621320344, 43.121320344, -3),
        (40.5, 2.284677193, -3),
        (40.325844046, -37.437921856, -3),
        (28.25, -52.5, -3),
        (16.174155954, -67.562078144, -3),
        (16, -82.534677193, -3),
    ]]
    fillet(casing_outer_edge_fillets_3mm_edges, radius=CASING_OUTER_EDGE_FILLETS_3MM_R)

    # Sketch4 → Bottom casing cut (cut, two sides: drawn at the far end of the back side and taken through both)
    with BuildSketch(Plane.ZY.offset(40.5).offset(-BOTTOM_CASING_CUT_DEPTH_BACK)):
        with Locations((35, -68.914124664)):
            Rectangle(SKETCH4_W, SKETCH4_H)
    extrude(amount=BOTTOM_CASING_CUT_DEPTH + BOTTOM_CASING_CUT_DEPTH_BACK, mode=Mode.SUBTRACT)

    # Sketch5 → Side screwholes (cut, two sides: drawn at the far end of the back side and taken through both)
    with BuildSketch(Plane(origin=(40.5, 0, 0), x_dir=(0, 0, -1), z_dir=(1, 0, 0)).offset(-SIDE_SCREWHOLES_DEPTH_BACK)):
        with Locations(Location((-53, 24.282257309, 0), (0, 0, 270))):
            Circle(SKETCH5_R)
        with Locations(Location((-53, -15.717742691, 0), (0, 0, 270))):
            Circle(SKETCH5_R)
    extrude(amount=SIDE_SCREWHOLES_DEPTH + SIDE_SCREWHOLES_DEPTH_BACK, mode=Mode.SUBTRACT)

    # Sketch6 → Top screwholes (cut, two sides: drawn at the far end of the back side and taken through both)
    with BuildSketch(Plane(origin=(0, 44, 0), x_dir=(1, 0, 0), z_dir=(0, 1, 0)).offset(-TOP_SCREWHOLES_DEPTH_BACK)):
        with Locations((14.5, -53)):
            Circle(SKETCH6_R)
        with Locations((-14.5, -53)):
            Circle(SKETCH6_R)
    extrude(amount=TOP_SCREWHOLES_DEPTH + TOP_SCREWHOLES_DEPTH_BACK, mode=Mode.SUBTRACT)


solid = part_1.part
